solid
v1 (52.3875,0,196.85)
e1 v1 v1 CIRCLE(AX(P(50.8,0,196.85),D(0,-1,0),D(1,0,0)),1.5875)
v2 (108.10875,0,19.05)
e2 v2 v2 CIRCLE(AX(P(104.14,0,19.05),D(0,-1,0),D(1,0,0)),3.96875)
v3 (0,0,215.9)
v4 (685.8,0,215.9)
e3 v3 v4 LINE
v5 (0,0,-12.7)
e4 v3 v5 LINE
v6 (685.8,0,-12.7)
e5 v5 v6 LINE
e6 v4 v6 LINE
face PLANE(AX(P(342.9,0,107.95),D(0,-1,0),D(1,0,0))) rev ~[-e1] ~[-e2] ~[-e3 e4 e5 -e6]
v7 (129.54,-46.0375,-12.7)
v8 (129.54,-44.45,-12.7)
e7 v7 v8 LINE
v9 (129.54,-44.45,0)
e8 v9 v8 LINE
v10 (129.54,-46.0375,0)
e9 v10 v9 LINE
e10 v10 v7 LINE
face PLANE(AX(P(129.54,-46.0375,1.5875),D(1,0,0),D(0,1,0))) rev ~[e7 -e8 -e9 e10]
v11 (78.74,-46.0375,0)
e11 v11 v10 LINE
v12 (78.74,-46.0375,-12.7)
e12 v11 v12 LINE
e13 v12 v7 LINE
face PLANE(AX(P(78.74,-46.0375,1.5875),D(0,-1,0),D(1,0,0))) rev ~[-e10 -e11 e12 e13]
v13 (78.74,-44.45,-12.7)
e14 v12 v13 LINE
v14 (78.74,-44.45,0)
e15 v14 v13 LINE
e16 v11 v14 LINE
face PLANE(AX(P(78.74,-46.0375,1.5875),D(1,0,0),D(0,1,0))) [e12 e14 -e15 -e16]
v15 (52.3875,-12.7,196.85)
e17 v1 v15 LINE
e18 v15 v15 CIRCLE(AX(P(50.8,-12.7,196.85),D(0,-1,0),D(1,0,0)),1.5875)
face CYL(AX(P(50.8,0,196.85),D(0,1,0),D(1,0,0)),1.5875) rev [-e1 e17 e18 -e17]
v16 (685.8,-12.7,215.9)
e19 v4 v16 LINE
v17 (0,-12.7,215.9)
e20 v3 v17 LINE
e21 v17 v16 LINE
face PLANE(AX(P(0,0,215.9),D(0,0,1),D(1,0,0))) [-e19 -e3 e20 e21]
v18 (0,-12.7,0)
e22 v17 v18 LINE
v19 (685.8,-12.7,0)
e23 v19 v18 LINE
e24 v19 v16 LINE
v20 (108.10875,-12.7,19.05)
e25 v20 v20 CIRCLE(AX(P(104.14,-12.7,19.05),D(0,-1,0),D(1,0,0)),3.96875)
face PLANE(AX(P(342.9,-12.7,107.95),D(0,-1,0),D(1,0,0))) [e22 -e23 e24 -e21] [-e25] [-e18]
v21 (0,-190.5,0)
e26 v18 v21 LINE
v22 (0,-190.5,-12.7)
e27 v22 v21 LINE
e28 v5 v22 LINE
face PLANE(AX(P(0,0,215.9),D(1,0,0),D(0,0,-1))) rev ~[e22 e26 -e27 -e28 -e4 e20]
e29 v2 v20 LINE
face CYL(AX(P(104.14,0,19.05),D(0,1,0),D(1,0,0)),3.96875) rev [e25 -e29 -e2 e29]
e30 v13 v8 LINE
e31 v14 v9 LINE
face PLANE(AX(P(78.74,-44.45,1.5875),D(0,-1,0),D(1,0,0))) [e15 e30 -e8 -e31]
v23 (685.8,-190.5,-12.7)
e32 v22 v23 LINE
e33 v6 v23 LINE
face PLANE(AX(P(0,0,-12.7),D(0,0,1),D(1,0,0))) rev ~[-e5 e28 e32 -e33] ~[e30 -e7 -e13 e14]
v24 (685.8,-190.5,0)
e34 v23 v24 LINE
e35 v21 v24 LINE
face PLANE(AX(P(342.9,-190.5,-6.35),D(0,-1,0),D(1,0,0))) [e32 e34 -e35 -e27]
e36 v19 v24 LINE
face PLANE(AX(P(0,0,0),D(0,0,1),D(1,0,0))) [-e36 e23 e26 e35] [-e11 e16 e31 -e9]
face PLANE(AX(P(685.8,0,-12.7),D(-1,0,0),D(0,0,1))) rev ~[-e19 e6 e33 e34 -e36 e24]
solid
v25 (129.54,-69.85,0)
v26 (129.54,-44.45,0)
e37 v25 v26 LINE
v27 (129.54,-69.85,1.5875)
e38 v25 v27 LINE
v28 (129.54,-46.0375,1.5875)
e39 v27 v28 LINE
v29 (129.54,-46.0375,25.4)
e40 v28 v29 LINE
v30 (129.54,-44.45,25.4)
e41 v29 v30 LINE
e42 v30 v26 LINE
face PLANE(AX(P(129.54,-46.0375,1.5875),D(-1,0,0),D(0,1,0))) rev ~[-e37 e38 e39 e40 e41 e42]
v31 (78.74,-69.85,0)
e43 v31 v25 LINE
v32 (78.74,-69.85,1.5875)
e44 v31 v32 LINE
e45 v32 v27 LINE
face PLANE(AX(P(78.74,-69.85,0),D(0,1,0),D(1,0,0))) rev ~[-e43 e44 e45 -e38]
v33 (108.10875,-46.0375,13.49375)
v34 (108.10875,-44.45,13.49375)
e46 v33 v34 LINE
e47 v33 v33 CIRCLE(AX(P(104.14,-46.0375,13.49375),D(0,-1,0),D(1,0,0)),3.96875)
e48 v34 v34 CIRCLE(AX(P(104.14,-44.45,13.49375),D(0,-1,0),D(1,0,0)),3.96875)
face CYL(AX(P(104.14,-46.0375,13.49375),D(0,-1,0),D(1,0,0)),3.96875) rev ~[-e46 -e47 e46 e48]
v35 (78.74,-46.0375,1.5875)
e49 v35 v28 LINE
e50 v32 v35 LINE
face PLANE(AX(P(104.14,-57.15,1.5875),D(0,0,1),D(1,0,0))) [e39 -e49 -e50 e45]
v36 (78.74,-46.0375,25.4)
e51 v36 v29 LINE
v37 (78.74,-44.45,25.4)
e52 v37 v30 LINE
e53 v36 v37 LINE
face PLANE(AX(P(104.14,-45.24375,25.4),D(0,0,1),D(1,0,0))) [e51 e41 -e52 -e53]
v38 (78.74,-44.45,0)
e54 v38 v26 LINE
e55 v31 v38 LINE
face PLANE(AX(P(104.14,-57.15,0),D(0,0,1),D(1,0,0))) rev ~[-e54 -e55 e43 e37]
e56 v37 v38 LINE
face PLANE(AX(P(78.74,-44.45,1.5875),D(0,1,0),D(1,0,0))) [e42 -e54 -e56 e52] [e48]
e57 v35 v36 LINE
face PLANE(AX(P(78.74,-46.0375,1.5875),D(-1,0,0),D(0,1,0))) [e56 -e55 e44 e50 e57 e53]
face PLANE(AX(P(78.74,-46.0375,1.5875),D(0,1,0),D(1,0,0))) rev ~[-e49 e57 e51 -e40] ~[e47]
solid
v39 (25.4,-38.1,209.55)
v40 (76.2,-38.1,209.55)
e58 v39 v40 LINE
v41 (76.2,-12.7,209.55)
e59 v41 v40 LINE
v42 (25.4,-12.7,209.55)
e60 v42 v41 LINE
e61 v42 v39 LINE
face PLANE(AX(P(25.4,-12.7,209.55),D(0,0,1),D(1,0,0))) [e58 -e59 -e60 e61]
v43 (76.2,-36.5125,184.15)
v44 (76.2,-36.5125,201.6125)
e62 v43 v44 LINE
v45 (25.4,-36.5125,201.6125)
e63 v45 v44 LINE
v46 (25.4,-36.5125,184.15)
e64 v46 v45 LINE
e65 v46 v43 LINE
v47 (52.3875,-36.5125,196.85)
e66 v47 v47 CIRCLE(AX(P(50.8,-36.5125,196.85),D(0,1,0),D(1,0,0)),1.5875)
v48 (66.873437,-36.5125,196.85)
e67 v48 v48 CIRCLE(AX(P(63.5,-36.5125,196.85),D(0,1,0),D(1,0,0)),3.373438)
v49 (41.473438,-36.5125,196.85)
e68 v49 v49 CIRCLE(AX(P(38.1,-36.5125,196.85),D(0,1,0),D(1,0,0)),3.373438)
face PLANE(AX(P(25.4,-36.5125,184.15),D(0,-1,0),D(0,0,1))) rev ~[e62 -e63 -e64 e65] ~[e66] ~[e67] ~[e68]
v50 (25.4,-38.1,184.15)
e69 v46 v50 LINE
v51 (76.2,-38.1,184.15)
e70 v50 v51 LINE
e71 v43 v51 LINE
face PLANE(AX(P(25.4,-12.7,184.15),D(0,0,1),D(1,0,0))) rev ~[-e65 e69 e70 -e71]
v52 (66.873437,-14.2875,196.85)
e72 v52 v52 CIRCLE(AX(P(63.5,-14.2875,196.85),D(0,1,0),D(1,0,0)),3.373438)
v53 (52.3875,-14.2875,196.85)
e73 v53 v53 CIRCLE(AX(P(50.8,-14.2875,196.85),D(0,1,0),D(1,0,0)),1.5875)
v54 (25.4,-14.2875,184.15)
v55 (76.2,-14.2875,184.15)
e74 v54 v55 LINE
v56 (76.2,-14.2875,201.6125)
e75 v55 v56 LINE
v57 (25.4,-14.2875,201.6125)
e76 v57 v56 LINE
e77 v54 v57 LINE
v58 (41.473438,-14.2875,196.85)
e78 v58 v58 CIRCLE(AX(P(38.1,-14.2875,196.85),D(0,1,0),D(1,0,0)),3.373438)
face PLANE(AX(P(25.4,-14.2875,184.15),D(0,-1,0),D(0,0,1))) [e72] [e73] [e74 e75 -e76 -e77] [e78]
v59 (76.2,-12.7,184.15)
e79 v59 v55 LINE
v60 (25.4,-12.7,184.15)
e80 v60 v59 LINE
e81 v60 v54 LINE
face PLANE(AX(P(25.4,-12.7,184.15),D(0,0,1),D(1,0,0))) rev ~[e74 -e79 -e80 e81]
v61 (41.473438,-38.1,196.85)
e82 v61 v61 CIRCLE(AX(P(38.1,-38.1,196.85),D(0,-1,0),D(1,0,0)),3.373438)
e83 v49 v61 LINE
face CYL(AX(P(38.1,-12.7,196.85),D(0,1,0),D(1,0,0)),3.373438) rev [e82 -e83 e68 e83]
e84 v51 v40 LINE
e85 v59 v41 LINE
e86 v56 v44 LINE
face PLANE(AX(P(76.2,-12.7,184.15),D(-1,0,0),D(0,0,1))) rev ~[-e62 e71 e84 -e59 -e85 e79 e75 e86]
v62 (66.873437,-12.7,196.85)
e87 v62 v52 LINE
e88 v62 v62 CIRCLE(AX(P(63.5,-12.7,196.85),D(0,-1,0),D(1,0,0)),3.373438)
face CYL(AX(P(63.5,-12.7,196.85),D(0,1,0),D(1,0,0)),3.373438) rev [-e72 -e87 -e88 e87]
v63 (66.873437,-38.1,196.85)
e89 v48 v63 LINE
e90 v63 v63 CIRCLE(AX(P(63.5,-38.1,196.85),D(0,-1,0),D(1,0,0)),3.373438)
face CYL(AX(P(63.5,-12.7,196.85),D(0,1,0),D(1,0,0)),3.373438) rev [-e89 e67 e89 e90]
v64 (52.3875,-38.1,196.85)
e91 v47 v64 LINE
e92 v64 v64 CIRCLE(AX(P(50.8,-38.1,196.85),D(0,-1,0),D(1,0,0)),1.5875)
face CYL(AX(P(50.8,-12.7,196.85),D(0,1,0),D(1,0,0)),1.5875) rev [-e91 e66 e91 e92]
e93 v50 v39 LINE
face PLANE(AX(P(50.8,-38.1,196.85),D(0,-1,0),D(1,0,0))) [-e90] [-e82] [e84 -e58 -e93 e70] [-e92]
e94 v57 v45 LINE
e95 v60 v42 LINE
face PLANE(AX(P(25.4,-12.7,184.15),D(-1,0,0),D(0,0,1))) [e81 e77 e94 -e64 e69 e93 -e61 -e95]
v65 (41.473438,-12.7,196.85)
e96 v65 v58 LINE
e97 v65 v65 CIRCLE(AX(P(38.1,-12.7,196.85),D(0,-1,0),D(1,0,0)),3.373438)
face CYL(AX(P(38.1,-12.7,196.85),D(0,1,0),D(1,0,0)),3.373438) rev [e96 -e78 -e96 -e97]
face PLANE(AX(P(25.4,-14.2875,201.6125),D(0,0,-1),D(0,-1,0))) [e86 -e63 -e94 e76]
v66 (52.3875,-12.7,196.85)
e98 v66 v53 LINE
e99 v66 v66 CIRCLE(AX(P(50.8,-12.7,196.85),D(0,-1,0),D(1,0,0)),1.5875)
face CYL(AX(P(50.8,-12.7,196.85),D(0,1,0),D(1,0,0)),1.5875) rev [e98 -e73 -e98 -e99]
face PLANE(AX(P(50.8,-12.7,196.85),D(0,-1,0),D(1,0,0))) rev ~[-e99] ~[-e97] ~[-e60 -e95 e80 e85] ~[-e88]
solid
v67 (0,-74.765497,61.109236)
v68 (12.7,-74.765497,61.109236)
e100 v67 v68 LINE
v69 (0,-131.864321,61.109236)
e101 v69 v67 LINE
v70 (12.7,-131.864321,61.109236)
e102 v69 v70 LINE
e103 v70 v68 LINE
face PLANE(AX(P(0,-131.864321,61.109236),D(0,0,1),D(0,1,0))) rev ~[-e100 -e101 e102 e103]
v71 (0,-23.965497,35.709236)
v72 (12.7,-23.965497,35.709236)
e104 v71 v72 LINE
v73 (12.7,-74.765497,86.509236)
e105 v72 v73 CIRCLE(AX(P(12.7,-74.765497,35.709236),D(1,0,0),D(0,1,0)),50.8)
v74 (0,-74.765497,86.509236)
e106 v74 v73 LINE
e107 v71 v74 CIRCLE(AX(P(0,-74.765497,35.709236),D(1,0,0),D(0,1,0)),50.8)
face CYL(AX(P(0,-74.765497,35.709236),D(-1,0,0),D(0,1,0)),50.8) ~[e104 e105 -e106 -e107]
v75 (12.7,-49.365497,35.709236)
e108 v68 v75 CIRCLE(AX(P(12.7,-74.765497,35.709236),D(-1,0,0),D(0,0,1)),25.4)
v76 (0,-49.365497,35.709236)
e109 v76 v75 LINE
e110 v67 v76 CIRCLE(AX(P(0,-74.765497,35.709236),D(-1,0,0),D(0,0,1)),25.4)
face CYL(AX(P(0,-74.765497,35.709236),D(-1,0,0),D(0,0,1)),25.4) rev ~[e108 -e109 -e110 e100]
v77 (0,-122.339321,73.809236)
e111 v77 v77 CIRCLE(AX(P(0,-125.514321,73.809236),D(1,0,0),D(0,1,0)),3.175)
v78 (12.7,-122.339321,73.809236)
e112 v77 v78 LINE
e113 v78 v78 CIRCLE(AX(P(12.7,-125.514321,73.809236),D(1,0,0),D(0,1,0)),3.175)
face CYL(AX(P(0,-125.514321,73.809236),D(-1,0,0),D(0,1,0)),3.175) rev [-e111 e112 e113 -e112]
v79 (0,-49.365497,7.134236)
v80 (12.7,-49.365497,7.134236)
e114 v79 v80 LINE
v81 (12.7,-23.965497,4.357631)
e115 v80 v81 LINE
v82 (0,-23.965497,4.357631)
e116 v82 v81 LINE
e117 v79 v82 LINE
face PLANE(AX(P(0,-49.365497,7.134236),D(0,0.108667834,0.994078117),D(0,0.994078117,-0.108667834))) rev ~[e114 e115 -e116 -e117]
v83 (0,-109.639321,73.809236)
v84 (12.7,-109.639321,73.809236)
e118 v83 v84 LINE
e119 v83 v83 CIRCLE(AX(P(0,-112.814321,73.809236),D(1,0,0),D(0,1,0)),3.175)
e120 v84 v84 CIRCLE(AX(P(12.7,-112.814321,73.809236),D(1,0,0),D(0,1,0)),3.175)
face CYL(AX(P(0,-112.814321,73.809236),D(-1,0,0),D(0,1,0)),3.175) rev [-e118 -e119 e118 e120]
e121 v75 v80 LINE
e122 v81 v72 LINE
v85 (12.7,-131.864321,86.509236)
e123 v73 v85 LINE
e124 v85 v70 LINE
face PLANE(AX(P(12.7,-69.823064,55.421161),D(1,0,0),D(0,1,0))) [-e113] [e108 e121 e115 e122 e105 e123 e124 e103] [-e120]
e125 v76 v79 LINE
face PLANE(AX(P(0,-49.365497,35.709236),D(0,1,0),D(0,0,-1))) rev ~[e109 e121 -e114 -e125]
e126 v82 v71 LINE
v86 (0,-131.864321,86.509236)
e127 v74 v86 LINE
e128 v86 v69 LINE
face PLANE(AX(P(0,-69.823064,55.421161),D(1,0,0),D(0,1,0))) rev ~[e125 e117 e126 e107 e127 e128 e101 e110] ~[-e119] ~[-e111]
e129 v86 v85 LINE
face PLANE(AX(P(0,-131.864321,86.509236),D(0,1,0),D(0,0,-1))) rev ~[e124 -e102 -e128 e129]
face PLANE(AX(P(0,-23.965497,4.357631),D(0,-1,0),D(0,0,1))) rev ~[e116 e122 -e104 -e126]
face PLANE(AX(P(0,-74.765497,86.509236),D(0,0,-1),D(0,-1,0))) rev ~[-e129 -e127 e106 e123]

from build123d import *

# Parameters (mm, degrees)
F0_W      = 685.8
F0_H      = 215.9
F0_R      = 3.96875
F0_R_2    = 1.5875
F0_H_2    = 12.7
F1_DEPTH  = 12.7
F2_R      = 3.175
F3_DEPTH  = 12.7
F4_DEPTH  = 190.5
F5_W      = 50.8
F5_H      = 25.4
F6_DEPTH  = 1.5875
F7_W      = 50.8
F7_H      = 1.5875
F8_DEPTH  = 23.8125
F9_DEPTH  = 14.2885
F10_W     = 50.8
F10_H     = 25.4
F10_R     = 3.3734375
F10_R_2   = 1.5875
F11_DEPTH = 25.4
F12_W     = 22.225
F12_H     = 17.4625
F13_DEPTH = 660.401
F14_R     = 3.96875
F15_DEPTH = 46.0385


# Not quite as in the source:
# - a feature names something its author has since deleted; it is built from what else it names


with BuildPart() as f1:
    # F0 (on Front) → F1 (new body)
    with BuildSketch(Plane.XZ):
        with Locations((342.9, 107.95)):
            Rectangle(F0_W, F0_H)
        with Locations((104.14, 19.05)):
            Circle(F0_R, mode=Mode.SUBTRACT)
        with Locations((50.8, 196.85)):
            Circle(F0_R_2, mode=Mode.SUBTRACT)
        with Locations((342.9, -6.35)):
            Rectangle(F0_W, F0_H_2)
    extrude(amount=F1_DEPTH)

    # F0 (on Front) → F4 (join)
    with BuildSketch(Plane.XZ):
        with Locations((342.9, -6.35)):
            Rectangle(F0_W, F0_H_2)
    extrude(amount=F4_DEPTH)

    # F7 (on face) → F9 (cut, through all)
    with BuildSketch(Plane.XY.offset(1.5875)):
        with Locations((104.14, -45.24375)):
            Rectangle(F7_W, F7_H)
    extrude(amount=-F9_DEPTH, mode=Mode.SUBTRACT)


with BuildPart() as f3:
    # F2 (on Right) → F3 (new body)
    with BuildSketch(Plane.YZ):
        with BuildLine():
            Line((-131.8643205314, 86.509236245), (-131.8643205314, 61.109236245))
            Line((-131.8643205314, 61.109236245), (-74.7654969597, 61.109236245))
            ThreePointArc((-74.7654969597, 61.109236245), (-56.8049847175, 53.6697484872), (-49.3654969597, 35.709236245))
            Line((-49.3654969597, 35.709236245), (-49.3654969597, 7.134236245))
            Line((-49.3654969597, 7.134236245), (-23.9654969597, 4.357630532))
            Line((-23.9654969597, 4.357630532), (-23.9654969597, 35.709236245))
            ThreePointArc((-23.9654969597, 35.709236245), (-38.8444724754, 71.6302607293), (-74.7654969597, 86.509236245))
            Line((-74.7654969597, 86.509236245), (-131.8643205314, 86.509236245))
        make_face()
        with Locations((-125.5143205314, 73.809236245)):
            Circle(F2_R, mode=Mode.SUBTRACT)
        with Locations((-112.8143205314, 73.809236245)):
            Circle(F2_R, mode=Mode.SUBTRACT)
    extrude(amount=F3_DEPTH)


with BuildPart() as f6:
    # F5 (on face) → F6 (new body)
    with BuildSketch(Plane.XY):
        with Locations((104.14, -57.15)):
            Rectangle(F5_W, F5_H)
    extrude(amount=F6_DEPTH)

    # F7 (on face) → F8 (join)
    with BuildSketch(Plane.XY.offset(1.5875)):
        with Locations((104.14, -45.24375)):
            Rectangle(F7_W, F7_H)
    extrude(amount=F8_DEPTH)

    # F14 (on face) → F15 (cut, through all)
    with BuildSketch(Plane.XZ.offset(46.0375)):
        with Locations((104.14, 13.49375)):
            Circle(F14_R)
    extrude(amount=-F15_DEPTH, mode=Mode.SUBTRACT)


with BuildPart() as f11:
    # F10 (on face) → F11 (new body)
    with BuildSketch(Plane.XZ.offset(12.7)):
        with Locations((50.8, 196.85)):
            Rectangle(F10_W, F10_H)
        with Locations((38.1, 196.85)):
            Circle(F10_R, mode=Mode.SUBTRACT)
        with Locations((50.8, 196.85)):
            Circle(F10_R_2, mode=Mode.SUBTRACT)
        with Locations((63.5, 196.85)):
            Circle(F10_R, mode=Mode.SUBTRACT)
    extrude(amount=F11_DEPTH)

    # F12 (on face) → F13 (cut, through all)
    with BuildSketch(Plane(origin=(25.4, 0, 0), x_dir=(0, -1, 0), z_dir=(-1, 0, 0))):
        with Locations((25.4, 192.88125)):
            Rectangle(F12_W, F12_H)
    extrude(amount=-F13_DEPTH, mode=Mode.SUBTRACT)


solid = Compound([f1.part, f3.part, f6.part, f11.part])
